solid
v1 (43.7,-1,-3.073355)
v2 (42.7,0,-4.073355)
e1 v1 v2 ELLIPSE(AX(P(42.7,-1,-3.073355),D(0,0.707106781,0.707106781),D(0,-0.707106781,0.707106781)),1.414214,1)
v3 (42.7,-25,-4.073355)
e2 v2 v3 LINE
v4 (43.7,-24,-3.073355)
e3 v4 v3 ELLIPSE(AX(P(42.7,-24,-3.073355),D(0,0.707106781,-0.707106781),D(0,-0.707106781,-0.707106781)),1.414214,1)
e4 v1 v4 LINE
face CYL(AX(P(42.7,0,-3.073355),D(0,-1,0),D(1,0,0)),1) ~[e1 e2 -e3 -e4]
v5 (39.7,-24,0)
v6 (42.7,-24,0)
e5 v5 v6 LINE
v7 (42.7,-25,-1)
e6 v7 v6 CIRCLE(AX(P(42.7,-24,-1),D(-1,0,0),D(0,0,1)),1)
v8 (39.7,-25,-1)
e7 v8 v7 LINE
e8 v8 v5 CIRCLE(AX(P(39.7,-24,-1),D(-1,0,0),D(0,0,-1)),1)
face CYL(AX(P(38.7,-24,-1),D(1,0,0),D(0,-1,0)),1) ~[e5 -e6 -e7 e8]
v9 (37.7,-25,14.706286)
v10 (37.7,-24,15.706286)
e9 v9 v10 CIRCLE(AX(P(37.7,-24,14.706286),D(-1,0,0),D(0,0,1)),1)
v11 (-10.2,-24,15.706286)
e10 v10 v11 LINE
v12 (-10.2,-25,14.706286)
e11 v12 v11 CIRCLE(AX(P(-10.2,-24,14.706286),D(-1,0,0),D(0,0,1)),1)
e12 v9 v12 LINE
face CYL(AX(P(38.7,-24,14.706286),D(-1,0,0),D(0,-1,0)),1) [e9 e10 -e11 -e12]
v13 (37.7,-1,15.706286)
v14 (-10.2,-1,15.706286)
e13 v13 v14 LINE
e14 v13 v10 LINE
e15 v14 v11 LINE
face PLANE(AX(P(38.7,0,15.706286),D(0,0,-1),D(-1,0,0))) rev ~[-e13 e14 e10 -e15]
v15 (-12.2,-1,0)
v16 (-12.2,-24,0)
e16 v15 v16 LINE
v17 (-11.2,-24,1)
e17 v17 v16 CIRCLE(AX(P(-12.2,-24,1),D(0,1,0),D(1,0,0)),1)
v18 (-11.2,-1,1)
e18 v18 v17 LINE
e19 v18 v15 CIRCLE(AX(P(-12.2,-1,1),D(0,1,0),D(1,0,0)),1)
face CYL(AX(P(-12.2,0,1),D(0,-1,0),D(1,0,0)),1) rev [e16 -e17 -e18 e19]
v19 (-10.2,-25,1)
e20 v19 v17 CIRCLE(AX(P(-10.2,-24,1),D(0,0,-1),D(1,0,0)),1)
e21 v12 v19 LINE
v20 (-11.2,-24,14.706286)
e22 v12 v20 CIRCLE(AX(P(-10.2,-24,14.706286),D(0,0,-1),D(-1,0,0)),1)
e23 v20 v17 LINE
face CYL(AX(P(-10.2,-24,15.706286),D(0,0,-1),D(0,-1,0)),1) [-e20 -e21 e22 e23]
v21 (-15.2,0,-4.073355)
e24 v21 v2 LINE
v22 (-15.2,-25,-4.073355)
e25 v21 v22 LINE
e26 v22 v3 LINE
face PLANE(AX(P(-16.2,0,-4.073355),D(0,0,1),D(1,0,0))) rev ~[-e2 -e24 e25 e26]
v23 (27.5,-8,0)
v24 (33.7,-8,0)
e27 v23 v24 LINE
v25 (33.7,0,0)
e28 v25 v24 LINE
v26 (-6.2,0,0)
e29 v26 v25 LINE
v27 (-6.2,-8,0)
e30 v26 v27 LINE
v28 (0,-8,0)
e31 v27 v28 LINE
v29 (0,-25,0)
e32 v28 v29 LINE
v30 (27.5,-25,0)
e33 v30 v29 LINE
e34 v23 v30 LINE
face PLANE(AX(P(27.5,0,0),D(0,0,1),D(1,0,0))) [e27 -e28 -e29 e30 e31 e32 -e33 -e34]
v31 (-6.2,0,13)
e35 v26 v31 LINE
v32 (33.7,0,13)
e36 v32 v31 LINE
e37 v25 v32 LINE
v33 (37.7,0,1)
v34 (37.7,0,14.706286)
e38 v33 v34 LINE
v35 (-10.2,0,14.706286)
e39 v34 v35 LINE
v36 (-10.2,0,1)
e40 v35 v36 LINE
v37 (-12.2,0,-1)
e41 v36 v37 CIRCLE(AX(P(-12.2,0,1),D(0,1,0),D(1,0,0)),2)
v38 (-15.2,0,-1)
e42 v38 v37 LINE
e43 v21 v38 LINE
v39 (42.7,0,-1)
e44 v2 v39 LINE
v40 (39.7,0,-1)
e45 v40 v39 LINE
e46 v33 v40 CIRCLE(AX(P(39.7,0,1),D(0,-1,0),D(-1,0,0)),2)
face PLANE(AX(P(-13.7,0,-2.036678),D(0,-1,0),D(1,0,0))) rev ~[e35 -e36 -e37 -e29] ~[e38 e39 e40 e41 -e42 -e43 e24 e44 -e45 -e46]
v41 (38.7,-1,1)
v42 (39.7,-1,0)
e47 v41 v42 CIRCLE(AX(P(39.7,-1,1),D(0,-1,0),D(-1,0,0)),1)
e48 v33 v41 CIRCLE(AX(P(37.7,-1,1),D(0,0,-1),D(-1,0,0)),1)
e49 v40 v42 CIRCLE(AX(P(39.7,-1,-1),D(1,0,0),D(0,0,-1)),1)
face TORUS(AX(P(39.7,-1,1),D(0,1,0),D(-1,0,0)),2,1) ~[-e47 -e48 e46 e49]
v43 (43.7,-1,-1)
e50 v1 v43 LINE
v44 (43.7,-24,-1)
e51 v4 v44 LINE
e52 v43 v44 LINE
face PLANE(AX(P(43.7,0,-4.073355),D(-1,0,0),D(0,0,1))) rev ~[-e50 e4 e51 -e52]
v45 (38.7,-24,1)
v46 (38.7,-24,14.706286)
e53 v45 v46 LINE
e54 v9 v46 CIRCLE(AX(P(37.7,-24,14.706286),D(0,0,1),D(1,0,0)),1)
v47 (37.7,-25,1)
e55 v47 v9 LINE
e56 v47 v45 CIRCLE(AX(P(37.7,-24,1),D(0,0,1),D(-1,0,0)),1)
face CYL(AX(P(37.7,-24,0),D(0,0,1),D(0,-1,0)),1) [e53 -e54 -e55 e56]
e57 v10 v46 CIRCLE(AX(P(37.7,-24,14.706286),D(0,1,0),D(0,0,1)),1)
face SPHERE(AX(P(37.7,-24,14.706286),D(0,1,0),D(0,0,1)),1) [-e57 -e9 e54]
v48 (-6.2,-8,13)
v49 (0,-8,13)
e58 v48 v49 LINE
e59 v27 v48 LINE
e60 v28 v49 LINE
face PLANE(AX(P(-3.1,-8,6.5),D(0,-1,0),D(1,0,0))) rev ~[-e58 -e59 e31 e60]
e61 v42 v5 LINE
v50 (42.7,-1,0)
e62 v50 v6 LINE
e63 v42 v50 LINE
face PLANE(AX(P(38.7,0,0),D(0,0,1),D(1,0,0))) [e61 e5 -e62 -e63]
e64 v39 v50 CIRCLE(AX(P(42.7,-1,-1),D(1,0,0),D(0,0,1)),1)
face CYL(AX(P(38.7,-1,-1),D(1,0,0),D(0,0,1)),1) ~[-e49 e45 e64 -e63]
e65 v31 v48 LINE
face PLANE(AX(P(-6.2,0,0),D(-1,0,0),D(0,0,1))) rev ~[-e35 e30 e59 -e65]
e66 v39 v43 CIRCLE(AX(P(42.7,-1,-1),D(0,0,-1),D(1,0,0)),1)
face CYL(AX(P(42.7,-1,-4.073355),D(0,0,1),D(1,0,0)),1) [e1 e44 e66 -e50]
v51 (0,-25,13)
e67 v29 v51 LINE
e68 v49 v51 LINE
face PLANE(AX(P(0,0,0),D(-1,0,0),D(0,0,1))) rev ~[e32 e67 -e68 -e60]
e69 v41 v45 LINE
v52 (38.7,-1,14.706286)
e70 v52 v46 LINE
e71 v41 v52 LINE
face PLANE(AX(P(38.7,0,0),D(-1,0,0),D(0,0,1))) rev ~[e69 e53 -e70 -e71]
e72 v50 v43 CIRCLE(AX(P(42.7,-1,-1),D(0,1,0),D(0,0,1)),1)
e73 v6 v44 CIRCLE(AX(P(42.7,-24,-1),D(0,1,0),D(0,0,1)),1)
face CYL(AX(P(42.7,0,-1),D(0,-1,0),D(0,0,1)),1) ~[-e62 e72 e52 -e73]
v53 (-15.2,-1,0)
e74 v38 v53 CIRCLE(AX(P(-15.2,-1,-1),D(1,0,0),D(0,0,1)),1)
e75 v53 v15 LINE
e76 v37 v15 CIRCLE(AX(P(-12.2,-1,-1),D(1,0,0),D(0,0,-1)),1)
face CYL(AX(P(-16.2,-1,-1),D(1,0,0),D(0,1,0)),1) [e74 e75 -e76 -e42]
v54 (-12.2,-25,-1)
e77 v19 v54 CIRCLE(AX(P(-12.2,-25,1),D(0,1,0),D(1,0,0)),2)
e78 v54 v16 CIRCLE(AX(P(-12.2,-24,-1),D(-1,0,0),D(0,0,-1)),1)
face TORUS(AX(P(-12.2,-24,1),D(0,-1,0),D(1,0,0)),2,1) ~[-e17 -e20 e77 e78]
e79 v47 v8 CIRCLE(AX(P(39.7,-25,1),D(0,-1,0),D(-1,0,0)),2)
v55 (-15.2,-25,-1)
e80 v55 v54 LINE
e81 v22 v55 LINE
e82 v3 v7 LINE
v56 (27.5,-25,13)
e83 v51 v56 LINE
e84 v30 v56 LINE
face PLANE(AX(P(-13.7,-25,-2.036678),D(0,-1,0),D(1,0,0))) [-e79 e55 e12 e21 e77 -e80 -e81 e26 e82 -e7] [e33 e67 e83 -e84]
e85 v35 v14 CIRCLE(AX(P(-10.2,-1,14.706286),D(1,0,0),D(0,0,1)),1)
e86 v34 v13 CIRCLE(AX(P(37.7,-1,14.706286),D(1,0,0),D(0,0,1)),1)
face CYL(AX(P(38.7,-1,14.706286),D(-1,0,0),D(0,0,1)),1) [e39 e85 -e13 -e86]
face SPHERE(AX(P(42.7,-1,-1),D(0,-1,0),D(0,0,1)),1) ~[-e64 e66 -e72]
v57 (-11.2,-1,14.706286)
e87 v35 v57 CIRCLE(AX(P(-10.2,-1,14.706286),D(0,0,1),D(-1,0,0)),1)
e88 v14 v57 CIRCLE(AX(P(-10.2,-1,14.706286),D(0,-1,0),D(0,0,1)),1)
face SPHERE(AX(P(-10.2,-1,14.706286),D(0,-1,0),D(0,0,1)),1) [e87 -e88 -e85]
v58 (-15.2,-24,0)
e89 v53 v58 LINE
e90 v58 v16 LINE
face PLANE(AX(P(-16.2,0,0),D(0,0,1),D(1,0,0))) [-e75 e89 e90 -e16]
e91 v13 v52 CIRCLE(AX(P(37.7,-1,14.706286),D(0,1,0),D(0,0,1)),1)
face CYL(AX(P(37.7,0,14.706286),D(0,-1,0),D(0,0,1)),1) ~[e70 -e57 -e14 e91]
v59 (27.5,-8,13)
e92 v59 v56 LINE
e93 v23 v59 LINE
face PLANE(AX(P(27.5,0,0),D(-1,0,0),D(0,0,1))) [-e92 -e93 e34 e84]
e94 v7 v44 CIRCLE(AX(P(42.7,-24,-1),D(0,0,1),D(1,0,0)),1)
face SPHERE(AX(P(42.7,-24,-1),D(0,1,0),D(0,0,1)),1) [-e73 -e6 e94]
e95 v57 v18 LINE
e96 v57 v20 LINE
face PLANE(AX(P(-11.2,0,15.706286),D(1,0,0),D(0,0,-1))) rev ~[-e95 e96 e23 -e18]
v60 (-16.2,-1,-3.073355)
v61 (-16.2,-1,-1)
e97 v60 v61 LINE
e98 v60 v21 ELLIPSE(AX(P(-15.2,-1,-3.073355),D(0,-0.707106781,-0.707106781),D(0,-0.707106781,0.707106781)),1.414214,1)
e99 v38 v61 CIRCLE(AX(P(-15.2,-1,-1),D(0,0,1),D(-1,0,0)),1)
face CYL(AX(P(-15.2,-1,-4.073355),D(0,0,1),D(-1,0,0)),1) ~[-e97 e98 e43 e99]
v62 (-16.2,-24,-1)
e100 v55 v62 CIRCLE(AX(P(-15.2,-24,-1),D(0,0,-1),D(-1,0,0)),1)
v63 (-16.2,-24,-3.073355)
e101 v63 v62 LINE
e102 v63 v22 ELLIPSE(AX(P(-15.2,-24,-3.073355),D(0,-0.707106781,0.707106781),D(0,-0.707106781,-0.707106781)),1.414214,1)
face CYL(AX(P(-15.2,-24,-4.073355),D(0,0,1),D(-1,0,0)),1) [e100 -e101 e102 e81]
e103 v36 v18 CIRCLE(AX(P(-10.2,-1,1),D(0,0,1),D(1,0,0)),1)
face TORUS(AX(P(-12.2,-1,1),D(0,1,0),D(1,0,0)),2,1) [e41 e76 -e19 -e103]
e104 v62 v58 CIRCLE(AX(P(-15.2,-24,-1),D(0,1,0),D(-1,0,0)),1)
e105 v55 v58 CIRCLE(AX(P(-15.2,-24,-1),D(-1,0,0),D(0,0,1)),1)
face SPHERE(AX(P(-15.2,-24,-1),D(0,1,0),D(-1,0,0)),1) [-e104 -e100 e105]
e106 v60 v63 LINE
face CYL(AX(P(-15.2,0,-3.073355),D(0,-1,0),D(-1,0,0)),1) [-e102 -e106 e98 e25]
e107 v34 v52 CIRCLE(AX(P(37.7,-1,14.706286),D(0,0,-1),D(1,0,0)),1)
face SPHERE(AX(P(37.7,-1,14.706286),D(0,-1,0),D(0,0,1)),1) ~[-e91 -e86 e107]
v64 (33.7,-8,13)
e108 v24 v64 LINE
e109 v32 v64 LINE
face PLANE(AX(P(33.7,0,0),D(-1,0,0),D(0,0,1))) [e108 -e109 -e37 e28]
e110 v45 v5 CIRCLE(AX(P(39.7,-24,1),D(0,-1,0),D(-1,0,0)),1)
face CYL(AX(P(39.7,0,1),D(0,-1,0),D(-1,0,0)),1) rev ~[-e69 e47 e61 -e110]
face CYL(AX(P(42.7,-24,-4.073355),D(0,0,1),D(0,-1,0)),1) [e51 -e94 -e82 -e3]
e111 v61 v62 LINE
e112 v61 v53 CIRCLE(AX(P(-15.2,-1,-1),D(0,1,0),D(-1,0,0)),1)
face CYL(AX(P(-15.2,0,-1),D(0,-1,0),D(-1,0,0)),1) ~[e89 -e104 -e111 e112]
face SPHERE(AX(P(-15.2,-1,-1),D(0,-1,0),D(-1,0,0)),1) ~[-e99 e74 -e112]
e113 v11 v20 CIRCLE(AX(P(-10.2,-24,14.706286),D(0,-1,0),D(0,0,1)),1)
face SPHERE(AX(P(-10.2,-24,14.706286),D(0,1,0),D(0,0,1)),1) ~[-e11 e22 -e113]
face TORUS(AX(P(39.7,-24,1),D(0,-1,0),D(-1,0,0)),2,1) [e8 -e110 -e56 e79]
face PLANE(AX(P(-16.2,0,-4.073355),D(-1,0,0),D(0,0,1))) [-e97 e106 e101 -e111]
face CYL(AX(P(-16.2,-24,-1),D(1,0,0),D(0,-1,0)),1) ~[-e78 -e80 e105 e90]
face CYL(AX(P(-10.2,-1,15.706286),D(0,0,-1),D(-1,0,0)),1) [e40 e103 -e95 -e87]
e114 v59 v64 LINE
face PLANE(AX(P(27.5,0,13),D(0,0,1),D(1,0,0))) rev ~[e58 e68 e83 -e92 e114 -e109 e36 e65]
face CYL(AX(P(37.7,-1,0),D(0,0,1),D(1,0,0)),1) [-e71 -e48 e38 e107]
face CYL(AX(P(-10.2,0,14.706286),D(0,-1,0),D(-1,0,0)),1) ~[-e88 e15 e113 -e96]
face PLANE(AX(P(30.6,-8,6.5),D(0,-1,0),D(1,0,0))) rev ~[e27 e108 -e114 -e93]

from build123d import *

# Parameters (mm, degrees)
F0_W     = 5
F0_H     = 4.0733553469
F0_W_2   = 6.2
F0_H_2   = 13
F1_DEPTH = 25
F2_DEPTH = 8
F3_R     = 1


with BuildPart() as f1:
    # F0 (on Front) → F1 (new body)
    with BuildSketch(Plane.XZ):
        with Locations((-13.7, -2.0366776735)):
            Rectangle(F0_W, F0_H)
        Polygon((38.7, 15.7062858343), (-11.2, 15.7062858343), (-11.2, 0), (-11.2, -4.0733553469), (38.7, -4.0733553469), (38.7, 0), align=None)
        Polygon((27.5, 0), (0, 0), (-6.2, 0), (-6.2, 13), (0, 13), (27.5, 13), (33.7, 13), (33.7, 0), align=None, mode=Mode.SUBTRACT)
        with Locations((41.2, -2.0366776735)):
            Rectangle(F0_W, F0_H)
        with Locations((-3.1, 6.5)):
            Rectangle(F0_W_2, F0_H_2)
        with Locations((30.6, 6.5)):
            Rectangle(F0_W_2, F0_H_2)
    extrude(amount=F1_DEPTH)

    # F0 (on Front) → F2 (cut)
    with BuildSketch(Plane.XZ):
        with Locations((30.6, 6.5)):
            Rectangle(F0_W_2, F0_H_2)
        with Locations((-3.1, 6.5)):
            Rectangle(F0_W_2, F0_H_2)
    extrude(amount=F2_DEPTH, mode=Mode.SUBTRACT)

    # F3
    f3_edges = [f1.edges().sort_by_distance(p)[0] for p in [
        (38.7, -12.5, 15.706286),
        (-11.2, -12.5, 15.706286),
        (13.75, 0, 15.706286),
        (13.75, -25, 15.706286),
        (38.7, -12.5, 0),
        (38.7, 0, 7.853143),
        (38.7, -25, 7.853143),
        (43.7, -12.5, 0),
        (41.2, 0, 0),
        (41.2, -25, 0),
        (43.7, -12.5, -4.073355),
        (43.7, 0, -2.036678),
        (43.7, -25, -2.036678),
        (-11.2, -12.5, 0),
        (-11.2, 0, 7.853143),
        (-11.2, -25, 7.853143),
        (-16.2, -12.5, 0),
        (-16.2, -12.5, -4.073355),
        (-16.2, 0, -2.036678),
        (-16.2, -25, -2.036678),
        (-13.7, 0, 0),
        (-13.7, -25, 0),
    ]]
    fillet(f3_edges, radius=F3_R)


solid = f1.part
